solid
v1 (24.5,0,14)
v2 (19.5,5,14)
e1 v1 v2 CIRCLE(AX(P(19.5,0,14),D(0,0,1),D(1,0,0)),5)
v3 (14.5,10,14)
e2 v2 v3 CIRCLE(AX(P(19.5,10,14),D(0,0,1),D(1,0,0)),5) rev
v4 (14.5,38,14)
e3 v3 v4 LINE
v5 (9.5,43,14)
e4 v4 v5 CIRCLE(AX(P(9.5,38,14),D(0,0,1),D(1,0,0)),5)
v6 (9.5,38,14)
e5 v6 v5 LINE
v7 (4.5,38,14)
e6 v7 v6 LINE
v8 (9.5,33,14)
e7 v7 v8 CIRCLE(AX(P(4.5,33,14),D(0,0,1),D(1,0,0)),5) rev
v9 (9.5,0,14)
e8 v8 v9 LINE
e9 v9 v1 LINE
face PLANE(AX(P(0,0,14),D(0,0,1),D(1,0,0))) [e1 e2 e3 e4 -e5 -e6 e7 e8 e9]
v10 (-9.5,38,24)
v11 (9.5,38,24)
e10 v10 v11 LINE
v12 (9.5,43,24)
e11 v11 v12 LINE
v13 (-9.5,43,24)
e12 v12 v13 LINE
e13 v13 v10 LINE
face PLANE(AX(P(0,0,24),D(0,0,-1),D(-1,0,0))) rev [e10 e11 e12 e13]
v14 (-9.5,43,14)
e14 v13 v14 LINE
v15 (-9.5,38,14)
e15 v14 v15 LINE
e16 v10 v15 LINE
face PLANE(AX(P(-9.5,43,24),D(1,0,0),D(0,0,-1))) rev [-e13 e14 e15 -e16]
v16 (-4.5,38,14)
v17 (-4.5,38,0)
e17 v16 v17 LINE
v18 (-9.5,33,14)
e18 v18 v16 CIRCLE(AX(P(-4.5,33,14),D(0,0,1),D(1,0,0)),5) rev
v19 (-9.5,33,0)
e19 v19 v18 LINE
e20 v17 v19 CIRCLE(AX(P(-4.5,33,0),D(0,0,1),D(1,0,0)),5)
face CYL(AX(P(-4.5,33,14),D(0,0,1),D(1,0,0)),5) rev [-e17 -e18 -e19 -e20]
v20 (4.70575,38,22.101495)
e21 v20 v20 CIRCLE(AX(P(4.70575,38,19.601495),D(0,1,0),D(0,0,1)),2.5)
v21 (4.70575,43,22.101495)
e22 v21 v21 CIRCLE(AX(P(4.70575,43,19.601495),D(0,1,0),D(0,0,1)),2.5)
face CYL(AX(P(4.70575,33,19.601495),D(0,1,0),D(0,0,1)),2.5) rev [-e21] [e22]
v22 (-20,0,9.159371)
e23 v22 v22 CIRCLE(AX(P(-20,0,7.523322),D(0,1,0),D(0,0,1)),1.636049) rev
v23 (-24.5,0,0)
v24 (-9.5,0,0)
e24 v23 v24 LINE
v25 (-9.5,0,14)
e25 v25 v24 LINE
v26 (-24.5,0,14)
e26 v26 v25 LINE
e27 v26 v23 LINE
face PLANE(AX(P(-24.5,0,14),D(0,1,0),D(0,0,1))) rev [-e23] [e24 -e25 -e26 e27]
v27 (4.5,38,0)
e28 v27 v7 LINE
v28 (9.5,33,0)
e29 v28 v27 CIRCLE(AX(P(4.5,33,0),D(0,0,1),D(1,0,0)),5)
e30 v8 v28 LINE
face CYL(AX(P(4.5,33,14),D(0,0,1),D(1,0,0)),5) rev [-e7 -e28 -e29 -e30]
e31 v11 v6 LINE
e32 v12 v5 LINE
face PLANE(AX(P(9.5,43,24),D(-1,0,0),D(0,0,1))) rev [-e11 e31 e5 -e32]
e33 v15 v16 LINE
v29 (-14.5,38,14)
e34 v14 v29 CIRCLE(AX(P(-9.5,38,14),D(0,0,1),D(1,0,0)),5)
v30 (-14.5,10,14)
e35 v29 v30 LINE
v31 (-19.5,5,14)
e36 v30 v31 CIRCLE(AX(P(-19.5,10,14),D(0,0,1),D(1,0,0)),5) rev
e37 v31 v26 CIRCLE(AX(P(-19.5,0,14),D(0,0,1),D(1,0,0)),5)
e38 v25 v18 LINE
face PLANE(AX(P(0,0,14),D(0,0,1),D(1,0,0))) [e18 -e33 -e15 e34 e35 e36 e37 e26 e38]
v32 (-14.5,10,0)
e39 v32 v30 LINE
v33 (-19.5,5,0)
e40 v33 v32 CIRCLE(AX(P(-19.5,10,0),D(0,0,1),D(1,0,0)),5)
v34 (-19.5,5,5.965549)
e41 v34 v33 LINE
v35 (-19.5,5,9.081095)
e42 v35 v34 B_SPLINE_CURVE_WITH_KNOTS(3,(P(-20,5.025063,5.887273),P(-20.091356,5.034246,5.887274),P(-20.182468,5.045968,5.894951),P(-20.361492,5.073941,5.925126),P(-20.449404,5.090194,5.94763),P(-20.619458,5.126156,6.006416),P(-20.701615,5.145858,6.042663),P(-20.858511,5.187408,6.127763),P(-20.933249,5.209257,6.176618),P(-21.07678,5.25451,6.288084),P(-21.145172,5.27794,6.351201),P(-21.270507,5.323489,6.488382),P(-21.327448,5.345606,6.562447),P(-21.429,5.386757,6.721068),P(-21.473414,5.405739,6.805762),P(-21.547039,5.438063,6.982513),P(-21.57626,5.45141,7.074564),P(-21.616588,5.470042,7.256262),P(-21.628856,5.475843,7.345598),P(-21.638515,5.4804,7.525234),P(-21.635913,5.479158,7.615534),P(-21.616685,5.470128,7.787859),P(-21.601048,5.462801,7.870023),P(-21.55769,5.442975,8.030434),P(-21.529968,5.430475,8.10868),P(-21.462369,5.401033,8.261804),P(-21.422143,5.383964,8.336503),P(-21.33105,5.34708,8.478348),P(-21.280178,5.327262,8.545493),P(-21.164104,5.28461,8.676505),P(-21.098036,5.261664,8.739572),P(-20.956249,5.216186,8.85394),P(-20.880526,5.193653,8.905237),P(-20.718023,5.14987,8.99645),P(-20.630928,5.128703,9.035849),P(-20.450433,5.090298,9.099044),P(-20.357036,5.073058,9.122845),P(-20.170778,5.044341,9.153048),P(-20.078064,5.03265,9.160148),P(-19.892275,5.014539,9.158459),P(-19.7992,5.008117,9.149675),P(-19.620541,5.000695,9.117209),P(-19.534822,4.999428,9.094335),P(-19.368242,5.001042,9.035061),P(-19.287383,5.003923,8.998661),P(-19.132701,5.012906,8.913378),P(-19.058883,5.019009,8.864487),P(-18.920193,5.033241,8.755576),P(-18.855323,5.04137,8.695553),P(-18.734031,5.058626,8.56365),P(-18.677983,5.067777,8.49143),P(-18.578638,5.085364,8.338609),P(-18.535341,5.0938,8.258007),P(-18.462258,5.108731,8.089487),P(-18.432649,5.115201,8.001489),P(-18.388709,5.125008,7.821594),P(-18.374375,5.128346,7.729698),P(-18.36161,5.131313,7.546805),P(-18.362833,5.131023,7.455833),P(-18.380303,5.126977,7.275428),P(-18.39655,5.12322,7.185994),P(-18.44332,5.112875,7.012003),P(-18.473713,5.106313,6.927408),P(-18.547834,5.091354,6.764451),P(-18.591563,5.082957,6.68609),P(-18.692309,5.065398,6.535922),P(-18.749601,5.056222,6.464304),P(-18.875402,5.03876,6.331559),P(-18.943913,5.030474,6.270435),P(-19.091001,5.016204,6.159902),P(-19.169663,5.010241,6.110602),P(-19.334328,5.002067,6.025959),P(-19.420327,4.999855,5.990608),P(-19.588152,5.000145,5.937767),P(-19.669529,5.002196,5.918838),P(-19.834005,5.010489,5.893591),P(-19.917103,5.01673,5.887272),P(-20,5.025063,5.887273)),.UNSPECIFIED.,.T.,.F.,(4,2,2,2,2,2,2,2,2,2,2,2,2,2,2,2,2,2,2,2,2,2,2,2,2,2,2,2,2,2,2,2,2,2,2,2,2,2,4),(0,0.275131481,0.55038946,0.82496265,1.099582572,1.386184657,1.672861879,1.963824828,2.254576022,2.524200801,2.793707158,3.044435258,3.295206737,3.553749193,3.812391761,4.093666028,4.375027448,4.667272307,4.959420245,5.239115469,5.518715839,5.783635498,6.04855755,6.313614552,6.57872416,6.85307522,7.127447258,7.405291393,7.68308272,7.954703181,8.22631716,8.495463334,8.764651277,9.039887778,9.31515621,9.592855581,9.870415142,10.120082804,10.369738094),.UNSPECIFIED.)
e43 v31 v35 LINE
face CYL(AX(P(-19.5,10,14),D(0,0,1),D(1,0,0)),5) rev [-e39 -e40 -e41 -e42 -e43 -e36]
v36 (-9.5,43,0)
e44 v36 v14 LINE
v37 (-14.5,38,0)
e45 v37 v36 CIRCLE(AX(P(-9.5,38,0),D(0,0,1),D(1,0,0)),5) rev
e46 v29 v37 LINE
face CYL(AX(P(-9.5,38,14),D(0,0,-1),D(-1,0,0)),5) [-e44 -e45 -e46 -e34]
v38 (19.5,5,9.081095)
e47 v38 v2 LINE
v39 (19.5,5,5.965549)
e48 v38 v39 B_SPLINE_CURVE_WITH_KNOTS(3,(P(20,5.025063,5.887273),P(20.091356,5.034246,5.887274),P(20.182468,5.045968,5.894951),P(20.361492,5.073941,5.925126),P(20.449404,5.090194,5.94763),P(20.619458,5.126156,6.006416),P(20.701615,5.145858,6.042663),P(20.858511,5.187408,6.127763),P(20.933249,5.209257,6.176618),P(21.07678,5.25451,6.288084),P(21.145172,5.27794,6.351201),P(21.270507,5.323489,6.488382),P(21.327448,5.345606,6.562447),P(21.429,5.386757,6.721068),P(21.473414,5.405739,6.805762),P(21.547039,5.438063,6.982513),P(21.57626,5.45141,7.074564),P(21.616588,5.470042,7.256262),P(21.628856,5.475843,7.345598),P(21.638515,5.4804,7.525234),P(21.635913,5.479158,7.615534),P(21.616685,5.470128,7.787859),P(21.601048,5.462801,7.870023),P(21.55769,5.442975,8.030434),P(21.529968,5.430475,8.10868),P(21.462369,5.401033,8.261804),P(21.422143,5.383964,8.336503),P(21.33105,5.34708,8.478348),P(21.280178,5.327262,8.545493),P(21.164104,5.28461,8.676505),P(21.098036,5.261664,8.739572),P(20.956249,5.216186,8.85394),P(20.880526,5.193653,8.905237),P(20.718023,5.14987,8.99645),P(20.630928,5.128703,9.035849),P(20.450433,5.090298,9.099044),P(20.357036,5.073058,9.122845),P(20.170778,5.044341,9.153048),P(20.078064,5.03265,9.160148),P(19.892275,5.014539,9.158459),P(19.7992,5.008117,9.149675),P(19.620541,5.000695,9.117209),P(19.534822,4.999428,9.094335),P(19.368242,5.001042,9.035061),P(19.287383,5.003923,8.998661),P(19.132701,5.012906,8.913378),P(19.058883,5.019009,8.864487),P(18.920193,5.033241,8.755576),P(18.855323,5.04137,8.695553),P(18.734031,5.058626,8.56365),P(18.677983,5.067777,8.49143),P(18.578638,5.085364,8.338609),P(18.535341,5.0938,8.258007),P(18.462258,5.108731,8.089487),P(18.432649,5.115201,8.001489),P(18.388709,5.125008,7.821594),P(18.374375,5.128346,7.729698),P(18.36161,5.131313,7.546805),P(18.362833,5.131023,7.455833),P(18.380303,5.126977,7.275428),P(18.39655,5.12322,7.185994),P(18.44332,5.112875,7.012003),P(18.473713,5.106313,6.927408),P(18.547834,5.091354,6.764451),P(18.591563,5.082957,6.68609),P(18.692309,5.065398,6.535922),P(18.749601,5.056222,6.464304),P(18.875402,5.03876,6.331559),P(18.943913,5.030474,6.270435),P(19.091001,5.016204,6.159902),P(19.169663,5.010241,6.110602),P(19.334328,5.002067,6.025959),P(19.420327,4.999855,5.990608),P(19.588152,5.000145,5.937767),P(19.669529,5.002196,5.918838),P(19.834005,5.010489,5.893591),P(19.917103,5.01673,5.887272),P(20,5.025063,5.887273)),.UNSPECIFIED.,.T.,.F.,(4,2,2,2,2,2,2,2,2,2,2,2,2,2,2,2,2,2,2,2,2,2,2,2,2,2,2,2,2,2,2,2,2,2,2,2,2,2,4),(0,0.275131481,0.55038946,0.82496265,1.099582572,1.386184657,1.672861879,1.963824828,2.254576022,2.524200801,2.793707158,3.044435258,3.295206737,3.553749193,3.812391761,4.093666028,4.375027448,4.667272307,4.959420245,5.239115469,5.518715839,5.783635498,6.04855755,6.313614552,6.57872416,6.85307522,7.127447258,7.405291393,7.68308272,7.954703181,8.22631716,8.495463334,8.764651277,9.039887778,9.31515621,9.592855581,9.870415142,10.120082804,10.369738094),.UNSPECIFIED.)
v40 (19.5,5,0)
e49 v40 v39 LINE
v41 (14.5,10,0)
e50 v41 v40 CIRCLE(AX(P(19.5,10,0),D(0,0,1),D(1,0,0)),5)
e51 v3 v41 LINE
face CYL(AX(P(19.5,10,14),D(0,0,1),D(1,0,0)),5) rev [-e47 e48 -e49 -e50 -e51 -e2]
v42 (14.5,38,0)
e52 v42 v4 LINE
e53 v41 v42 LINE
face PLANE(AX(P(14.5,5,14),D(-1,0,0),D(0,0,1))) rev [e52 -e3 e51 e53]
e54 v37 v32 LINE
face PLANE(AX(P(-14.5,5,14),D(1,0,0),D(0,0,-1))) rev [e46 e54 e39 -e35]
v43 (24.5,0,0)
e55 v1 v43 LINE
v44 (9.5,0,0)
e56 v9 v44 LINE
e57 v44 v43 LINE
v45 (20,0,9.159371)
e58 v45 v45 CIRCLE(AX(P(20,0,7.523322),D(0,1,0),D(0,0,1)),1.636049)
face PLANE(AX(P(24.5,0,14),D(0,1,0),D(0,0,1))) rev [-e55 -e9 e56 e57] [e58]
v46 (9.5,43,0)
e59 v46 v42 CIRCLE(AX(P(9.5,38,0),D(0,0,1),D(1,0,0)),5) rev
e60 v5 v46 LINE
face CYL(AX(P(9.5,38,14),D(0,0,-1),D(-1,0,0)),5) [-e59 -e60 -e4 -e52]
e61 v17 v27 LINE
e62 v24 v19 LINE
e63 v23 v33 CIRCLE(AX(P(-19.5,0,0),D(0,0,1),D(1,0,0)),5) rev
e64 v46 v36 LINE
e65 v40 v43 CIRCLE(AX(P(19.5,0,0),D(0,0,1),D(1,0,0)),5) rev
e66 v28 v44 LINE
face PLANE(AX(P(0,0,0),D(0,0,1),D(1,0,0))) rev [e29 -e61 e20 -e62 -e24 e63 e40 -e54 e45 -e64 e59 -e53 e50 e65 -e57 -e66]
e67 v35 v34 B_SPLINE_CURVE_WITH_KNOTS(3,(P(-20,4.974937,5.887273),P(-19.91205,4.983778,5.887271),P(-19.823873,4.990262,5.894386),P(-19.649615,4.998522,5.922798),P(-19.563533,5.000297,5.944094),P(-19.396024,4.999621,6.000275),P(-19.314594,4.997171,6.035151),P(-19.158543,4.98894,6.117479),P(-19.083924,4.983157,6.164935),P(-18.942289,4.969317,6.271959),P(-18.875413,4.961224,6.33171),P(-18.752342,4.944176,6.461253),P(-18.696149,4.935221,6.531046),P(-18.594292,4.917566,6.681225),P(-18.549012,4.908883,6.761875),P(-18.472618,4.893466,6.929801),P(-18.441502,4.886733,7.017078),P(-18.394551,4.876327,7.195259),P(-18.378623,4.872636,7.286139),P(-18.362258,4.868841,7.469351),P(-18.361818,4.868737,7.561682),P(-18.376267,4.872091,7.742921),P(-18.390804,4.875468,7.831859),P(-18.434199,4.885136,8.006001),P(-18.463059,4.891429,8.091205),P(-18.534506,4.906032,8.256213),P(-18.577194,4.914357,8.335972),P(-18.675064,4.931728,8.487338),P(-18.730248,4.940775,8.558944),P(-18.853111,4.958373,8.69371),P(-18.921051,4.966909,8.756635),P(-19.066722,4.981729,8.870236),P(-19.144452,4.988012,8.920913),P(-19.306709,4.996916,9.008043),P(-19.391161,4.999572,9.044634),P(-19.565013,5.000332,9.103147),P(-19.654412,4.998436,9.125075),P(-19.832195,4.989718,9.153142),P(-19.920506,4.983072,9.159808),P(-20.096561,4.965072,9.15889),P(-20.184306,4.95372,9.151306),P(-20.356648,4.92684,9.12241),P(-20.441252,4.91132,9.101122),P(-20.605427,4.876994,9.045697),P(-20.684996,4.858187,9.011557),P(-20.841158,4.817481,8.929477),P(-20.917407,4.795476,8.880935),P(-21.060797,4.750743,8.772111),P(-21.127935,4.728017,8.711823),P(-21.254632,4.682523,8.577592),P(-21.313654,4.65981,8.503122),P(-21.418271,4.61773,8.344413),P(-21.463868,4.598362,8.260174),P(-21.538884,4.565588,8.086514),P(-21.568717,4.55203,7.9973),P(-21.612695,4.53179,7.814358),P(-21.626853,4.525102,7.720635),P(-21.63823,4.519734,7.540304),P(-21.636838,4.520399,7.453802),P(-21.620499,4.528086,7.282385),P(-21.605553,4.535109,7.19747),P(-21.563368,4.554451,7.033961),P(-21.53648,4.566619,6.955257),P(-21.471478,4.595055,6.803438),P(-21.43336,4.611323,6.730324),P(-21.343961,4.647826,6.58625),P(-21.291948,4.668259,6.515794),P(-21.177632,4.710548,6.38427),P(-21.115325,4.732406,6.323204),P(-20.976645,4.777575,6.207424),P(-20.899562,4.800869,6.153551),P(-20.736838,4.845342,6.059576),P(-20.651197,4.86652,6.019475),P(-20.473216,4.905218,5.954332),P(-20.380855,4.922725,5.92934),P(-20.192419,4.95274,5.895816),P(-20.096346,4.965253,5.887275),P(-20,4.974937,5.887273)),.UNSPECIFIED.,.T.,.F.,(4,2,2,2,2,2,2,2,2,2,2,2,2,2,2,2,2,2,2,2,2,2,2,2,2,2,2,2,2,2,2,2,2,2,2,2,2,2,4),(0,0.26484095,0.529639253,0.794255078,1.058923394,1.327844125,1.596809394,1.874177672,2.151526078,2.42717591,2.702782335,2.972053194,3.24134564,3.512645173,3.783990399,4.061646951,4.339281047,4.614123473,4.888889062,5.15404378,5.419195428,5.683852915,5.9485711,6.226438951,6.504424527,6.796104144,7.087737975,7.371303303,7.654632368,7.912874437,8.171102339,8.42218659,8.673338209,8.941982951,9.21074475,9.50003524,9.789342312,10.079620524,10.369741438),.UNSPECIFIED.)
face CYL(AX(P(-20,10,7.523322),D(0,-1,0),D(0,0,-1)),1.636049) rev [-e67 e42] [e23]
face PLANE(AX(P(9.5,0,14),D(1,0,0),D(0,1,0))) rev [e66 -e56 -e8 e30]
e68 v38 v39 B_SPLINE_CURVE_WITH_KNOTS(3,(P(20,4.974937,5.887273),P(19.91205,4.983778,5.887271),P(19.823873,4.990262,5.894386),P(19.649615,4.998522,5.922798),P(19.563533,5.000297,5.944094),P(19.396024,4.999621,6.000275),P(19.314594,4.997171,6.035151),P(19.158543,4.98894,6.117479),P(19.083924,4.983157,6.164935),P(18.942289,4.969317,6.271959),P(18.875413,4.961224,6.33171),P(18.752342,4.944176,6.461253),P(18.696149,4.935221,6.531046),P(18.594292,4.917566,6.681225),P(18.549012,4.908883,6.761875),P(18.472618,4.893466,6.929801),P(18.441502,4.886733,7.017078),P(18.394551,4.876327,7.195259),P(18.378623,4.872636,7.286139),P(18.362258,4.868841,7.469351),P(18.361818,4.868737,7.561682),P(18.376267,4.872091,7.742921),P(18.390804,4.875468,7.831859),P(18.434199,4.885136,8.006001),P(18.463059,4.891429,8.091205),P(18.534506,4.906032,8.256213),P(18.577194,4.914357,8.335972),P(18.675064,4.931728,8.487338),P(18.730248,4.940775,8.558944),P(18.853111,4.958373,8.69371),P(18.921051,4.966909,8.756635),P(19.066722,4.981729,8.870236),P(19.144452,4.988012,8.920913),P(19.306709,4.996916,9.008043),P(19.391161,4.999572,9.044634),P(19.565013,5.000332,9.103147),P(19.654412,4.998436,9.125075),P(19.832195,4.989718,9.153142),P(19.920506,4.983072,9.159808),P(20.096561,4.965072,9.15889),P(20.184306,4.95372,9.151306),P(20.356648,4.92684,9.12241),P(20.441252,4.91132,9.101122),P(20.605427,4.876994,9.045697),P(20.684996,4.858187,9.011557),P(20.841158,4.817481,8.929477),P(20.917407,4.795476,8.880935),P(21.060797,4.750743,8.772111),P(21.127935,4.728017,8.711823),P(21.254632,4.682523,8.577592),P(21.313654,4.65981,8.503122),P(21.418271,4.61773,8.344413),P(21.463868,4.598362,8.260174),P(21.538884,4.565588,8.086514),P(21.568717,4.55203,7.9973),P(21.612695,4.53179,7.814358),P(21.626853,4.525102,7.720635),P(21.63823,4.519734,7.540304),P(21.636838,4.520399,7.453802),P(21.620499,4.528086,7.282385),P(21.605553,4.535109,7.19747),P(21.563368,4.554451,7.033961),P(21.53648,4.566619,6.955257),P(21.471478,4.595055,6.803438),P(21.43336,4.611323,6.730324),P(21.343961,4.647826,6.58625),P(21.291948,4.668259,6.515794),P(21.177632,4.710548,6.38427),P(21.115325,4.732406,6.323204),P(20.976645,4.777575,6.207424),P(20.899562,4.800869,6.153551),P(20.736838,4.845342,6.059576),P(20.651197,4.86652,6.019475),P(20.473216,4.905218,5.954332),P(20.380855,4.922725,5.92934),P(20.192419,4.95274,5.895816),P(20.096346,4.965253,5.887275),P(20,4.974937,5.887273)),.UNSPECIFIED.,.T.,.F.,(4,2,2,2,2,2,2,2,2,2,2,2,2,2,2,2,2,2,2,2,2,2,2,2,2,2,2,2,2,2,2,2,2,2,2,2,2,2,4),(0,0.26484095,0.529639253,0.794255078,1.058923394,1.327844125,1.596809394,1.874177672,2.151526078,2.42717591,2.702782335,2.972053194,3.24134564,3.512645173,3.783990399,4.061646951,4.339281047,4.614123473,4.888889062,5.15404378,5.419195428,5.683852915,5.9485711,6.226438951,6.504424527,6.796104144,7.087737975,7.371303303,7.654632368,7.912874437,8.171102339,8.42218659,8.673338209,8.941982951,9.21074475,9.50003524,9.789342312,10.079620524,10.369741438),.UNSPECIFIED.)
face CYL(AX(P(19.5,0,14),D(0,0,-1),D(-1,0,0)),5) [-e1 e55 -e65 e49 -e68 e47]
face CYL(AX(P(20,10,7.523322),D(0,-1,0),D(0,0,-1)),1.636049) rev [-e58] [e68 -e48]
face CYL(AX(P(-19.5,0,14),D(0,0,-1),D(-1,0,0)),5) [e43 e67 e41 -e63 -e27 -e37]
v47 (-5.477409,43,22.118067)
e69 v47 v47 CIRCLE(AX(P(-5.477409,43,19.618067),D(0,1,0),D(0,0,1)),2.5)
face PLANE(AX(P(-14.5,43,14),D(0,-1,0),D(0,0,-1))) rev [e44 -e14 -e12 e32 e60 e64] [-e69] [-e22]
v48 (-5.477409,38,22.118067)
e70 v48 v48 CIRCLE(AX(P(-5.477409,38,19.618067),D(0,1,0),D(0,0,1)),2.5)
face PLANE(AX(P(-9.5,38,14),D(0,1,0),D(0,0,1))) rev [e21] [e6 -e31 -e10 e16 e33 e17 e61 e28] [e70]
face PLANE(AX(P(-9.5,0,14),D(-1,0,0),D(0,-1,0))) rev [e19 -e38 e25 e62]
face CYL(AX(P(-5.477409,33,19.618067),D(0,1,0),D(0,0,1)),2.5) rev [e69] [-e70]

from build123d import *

# Parameters (mm, degrees)
BOSS_EXTRUDE1_DEPTH     = 14
FILLET1_R               = 5
FILLET2_R               = 5
CUT_EXTRUDE3_DEPTH      = 10
CUT_EXTRUDE3_DEPTH_BACK = 10
SKETCH2_R               = 1.636049027
SKETCH4_W               = 19
SKETCH4_H               = 5
BOSS_EXTRUDE2_DEPTH     = 10
SKETCH5_R               = 2.5
CUT_EXTRUDE4_DEPTH      = 10


with BuildPart() as part:
    # Sketch1 → Boss-Extrude1 (new body)
    with BuildSketch(Plane.XY):
        Polygon((-24.5, 0), (-24.5, 5), (-14.5, 5), (-14.5, 43), (14.5, 43), (14.5, 5), (24.5, 5), (24.5, 0), (9.5, 0), (9.5, 38), (-9.5, 38), (-9.5, 0), align=None)
    extrude(amount=BOSS_EXTRUDE1_DEPTH)

    # Fillet1
    fillet1_edges = [part.edges().sort_by_distance(p)[0] for p in [
        (-14.5, 43, 7),
        (14.5, 43, 7),
        (24.5, 5, 7),
        (-24.5, 5, 7),
        (14.5, 5, 7),
        (-14.5, 5, 7),
    ]]
    fillet(fillet1_edges, radius=FILLET1_R - 0.0001)  # a hair under: the kernel refuses the full size

    # Fillet2
    fillet2_edges = [part.edges().sort_by_distance(p)[0] for p in [
        (9.5, 38, 7),
        (-9.5, 38, 7),
    ]]
    fillet(fillet2_edges, radius=FILLET2_R)

    # Sketch2 → Cut-Extrude3 (cut, two sides: drawn at the far end of the back side and taken through both)
    with BuildSketch(Plane(origin=(0, 0, 0), x_dir=(1, 0, 0), z_dir=(0, 1, 0)).offset(-CUT_EXTRUDE3_DEPTH_BACK)):
        with Locations(Location((-20, -7.523321805, 0), (0, 0, 72.20487372))):
            Circle(SKETCH2_R)
        with Locations(Location((20, -7.523321805, 0), (0, 0, 107.795126278))):
            Circle(SKETCH2_R)
    extrude(amount=CUT_EXTRUDE3_DEPTH + CUT_EXTRUDE3_DEPTH_BACK, mode=Mode.SUBTRACT)

    # Sketch4 → Boss-Extrude2 (add)
    with BuildSketch(Plane.XY.offset(14)):
        with Locations((0, 40.5)):
            Rectangle(SKETCH4_W, SKETCH4_H)
    extrude(amount=BOSS_EXTRUDE2_DEPTH)

    # Sketch5 → Cut-Extrude4 (cut)
    with BuildSketch(Plane(origin=(0, 43, 0), x_dir=(1, 0, 0), z_dir=(0, 1, 0))):
        with Locations(Location((4.70575, -19.60149527, 0), (0, 0, 270))):
            Circle(SKETCH5_R)
        with Locations(Location((-5.477408827, -19.618067384, 0), (0, 0, 270))):
            Circle(SKETCH5_R)
    extrude(amount=-CUT_EXTRUDE4_DEPTH, mode=Mode.SUBTRACT)


solid = part.part
